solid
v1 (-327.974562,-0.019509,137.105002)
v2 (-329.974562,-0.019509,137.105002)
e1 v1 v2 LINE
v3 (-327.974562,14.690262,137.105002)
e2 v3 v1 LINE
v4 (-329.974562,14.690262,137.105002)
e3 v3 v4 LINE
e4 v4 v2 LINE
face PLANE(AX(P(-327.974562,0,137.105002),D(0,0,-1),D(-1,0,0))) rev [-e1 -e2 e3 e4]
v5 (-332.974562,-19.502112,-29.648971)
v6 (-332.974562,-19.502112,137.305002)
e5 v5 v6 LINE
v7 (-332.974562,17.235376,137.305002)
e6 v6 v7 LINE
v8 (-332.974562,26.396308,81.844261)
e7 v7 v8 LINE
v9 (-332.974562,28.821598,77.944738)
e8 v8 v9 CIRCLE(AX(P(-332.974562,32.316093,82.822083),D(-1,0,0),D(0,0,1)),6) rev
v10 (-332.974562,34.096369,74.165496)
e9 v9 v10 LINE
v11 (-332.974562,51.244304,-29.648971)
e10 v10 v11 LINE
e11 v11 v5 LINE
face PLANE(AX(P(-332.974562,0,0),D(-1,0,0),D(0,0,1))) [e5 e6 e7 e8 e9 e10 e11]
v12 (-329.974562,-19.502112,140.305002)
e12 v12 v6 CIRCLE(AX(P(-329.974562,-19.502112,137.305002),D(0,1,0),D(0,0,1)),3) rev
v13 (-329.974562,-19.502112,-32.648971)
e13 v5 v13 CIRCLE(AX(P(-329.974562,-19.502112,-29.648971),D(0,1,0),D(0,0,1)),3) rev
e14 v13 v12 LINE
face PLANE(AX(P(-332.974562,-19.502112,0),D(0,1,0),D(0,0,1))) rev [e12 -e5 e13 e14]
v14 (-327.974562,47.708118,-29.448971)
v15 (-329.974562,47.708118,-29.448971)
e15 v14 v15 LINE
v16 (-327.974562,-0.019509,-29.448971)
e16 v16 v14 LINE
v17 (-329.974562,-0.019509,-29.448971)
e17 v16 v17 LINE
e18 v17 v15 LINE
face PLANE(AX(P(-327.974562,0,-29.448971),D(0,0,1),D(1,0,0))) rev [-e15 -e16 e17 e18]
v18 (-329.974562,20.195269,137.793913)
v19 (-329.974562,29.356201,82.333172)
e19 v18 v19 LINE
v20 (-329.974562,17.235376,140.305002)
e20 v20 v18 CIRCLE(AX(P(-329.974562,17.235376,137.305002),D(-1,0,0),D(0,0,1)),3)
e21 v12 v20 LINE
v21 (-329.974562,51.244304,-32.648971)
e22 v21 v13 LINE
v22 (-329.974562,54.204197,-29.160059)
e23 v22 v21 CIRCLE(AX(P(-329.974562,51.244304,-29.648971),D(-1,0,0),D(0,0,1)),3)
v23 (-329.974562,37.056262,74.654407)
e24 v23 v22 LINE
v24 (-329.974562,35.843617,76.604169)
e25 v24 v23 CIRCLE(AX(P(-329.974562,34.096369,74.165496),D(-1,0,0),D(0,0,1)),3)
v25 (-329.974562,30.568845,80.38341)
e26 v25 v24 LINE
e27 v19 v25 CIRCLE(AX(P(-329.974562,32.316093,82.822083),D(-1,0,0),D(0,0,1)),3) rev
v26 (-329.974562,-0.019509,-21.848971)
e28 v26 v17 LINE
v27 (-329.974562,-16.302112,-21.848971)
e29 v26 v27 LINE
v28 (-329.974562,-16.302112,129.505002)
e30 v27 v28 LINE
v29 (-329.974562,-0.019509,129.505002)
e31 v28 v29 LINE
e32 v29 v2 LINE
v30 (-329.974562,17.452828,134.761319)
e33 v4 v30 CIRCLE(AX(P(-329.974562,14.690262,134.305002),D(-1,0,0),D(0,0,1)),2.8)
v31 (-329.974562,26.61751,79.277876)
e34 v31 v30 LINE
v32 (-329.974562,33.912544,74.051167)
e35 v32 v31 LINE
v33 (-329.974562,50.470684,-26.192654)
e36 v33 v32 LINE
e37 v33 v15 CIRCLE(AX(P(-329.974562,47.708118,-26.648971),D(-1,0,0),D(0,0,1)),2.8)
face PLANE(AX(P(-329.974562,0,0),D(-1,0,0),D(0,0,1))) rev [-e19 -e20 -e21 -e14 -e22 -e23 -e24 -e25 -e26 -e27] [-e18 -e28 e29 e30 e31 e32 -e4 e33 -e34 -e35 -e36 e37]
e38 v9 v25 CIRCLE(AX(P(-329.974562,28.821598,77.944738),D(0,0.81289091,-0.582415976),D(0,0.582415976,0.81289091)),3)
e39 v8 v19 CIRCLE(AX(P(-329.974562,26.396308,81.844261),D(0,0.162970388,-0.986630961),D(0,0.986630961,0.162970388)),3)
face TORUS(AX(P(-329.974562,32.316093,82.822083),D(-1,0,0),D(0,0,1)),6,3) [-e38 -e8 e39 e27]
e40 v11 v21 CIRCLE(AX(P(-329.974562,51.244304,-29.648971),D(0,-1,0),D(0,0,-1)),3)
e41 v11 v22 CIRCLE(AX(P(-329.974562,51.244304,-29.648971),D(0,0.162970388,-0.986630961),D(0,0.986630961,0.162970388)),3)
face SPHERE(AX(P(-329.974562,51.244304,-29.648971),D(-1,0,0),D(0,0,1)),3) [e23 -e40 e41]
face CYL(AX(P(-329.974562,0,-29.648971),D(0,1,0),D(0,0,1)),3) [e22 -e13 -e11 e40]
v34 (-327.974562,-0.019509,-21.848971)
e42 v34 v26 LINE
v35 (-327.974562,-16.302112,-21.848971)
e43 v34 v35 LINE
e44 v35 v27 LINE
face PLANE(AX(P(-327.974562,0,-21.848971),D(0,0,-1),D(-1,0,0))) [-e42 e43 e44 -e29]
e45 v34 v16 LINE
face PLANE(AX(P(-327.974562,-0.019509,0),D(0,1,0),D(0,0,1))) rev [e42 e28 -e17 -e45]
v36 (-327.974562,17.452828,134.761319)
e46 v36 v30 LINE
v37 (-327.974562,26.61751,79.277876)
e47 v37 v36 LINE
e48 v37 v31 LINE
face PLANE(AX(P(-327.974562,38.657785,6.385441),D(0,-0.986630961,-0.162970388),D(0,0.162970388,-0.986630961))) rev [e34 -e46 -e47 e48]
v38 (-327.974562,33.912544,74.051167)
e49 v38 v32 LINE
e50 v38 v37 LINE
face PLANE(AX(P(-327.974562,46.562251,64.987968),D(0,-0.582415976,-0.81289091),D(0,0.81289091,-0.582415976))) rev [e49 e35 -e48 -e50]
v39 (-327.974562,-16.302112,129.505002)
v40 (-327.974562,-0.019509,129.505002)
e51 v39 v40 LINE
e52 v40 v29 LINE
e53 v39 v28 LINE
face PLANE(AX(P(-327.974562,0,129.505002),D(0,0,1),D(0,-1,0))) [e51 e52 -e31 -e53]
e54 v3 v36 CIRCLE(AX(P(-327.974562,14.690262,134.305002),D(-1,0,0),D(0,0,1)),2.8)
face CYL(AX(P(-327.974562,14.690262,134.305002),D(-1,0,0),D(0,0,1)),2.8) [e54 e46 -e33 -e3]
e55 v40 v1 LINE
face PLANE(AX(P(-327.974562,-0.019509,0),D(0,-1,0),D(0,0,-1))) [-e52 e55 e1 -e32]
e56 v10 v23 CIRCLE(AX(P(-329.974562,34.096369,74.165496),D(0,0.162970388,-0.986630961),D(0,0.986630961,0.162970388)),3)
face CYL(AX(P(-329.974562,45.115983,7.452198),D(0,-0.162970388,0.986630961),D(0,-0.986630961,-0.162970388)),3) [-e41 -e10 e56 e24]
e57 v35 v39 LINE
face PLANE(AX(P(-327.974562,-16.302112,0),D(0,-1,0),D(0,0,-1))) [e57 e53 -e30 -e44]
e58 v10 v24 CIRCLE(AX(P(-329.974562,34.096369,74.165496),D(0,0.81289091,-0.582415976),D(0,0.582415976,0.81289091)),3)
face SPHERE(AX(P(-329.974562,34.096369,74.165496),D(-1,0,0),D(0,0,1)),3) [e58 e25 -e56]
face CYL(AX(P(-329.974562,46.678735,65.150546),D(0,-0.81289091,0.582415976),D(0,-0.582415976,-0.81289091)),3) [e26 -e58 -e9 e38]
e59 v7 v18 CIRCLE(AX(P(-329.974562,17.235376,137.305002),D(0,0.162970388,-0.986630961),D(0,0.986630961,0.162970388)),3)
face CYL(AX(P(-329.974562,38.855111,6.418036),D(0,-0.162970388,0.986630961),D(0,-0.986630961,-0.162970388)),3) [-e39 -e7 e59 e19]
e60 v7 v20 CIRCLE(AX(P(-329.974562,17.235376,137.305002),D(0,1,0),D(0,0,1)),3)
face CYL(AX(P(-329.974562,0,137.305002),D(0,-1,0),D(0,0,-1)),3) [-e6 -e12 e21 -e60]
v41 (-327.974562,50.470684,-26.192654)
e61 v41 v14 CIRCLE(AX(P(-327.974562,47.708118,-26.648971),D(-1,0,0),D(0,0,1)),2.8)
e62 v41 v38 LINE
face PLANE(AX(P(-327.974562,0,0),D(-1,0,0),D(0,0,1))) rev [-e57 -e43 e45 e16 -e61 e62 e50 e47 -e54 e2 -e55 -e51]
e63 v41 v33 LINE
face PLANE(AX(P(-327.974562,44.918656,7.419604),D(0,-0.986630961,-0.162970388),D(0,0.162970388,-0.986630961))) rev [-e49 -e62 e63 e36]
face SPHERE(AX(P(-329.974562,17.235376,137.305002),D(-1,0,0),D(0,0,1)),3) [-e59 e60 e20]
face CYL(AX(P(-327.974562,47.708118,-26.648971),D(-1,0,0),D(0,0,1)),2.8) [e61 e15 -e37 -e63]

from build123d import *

# Parameters (mm, degrees)
BOSS_EXTRUDE1_DEPTH = 2
BOSS_EXTRUDE2_START = 3
BOSS_EXTRUDE2_DEPTH = 3
FILLET1_R           = 3


with BuildPart() as part:
    # Sketch1 → Boss-Extrude1 (new body)
    with BuildSketch(Plane.ZY.offset(329.974562358)):
        with BuildLine():
            Line((137.105001839, 14.690261729), (137.105001839, -0.019509128))
            Line((137.105001839, -0.019509128), (133.705001839, -0.019509128))
            Line((133.705001839, -0.019509128), (129.505001839, -0.019509128))
            Line((129.505001839, -0.019509128), (129.505001839, -16.302112125))
            Line((129.505001839, -16.302112125), (-21.848970599, -16.302112125))
            Line((-21.848970599, -16.302112125), (-21.848970599, -0.019509128))
            Line((-21.848970599, -0.019509128), (-26.048970599, -0.019509128))
            Line((-26.048970599, -0.019509128), (-29.448970599, -0.019509128))
            Line((-29.448970599, -0.019509128), (-29.448970599, 47.708117707))
            ThreePointArc((-29.448970599, 47.708117707), (-28.460366767, 49.843262649), (-26.192653512, 50.470684397))
            Line((-26.192653512, 50.470684397), (74.05116687, 33.912543624))
            Line((74.05116687, 33.912543624), (79.277875997, 26.617509644))
            Line((79.277875997, 26.617509644), (134.761318926, 17.452828418))
            ThreePointArc((134.761318926, 17.452828418), (136.440146781, 16.501657897), (137.105001839, 14.690261729))
        make_face()
    extrude(amount=-BOSS_EXTRUDE1_DEPTH)

    # Sketch1<4> → Boss-Extrude2 (add)
    # profile 1 of 3: a face of its own
    with BuildSketch(Plane.ZY.offset(329.974562358).offset(BOSS_EXTRUDE2_START)):
        with BuildLine():
            Line((-32.648970599, -19.502112125), (140.305001839, -19.502112125))
            Line((140.305001839, -19.502112125), (140.305001839, -10.219509128))
            Line((140.305001839, -10.219509128), (133.705001839, -10.219509128))
            Line((133.705001839, -10.219509128), (133.705001839, -0.219509128))
            Line((133.705001839, -0.219509128), (137.305001839, -0.219509128))
            Line((137.305001839, -0.219509128), (137.305001839, 14.690261729))
            ThreePointArc((137.305001839, 14.690261729), (136.592657134, 16.631043337), (134.793913004, 17.650154611))
            Line((134.793913004, 17.650154611), (79.39220526, 26.801334927))
            Line((79.39220526, 26.801334927), (74.165496133, 34.096368907))
            Line((74.165496133, 34.096368907), (-26.160059434, 50.668010589))
            ThreePointArc((-26.160059434, 50.668010589), (-28.589752208, 49.995773002), (-29.648970599, 47.708117707))
            Line((-29.648970599, 47.708117707), (-29.648970599, -0.219509128))
            Line((-29.648970599, -0.219509128), (-26.048970599, -0.219509128))
            Line((-26.048970599, -0.219509128), (-26.048970599, -10.219509128))
            Line((-26.048970599, -10.219509128), (-32.648970599, -10.219509128))
            Line((-32.648970599, -10.219509128), (-32.648970599, -19.502112125))
        make_face()
        with BuildLine():
            ThreePointArc((137.105001839, 14.690261729), (136.440146781, 16.501657897), (134.761318926, 17.452828418))
            Line((134.761318926, 17.452828418), (79.277875997, 26.617509644))
            Line((79.277875997, 26.617509644), (74.05116687, 33.912543624))
            Line((74.05116687, 33.912543624), (-26.192653512, 50.470684397))
            ThreePointArc((-26.192653512, 50.470684397), (-28.460366767, 49.843262649), (-29.448970599, 47.708117707))
            Line((-29.448970599, 47.708117707), (-29.448970599, -0.019509128))
            Line((-29.448970599, -0.019509128), (-26.048970599, -0.019509128))
            Line((-26.048970599, -0.019509128), (-21.848970599, -0.019509128))
            Line((-21.848970599, -0.019509128), (-21.848970599, -16.302112125))
            Line((-21.848970599, -16.302112125), (129.505001839, -16.302112125))
            Line((129.505001839, -16.302112125), (129.505001839, -0.019509128))
            Line((129.505001839, -0.019509128), (133.705001839, -0.019509128))
            Line((133.705001839, -0.019509128), (137.105001839, -0.019509128))
            Line((137.105001839, -0.019509128), (137.105001839, 14.690261729))
        make_face(mode=Mode.SUBTRACT)
    # profile 2 of 3: a face of its own
    with BuildSketch(Plane.ZY.offset(329.974562358).offset(BOSS_EXTRUDE2_START)):
        with BuildLine():
            ThreePointArc((76.604168861, 35.843616835), (75.749893119, 36.643855156), (74.654407298, 37.056261789))
            Line((74.654407298, 37.056261789), (-29.160059434, 54.204197172))
            ThreePointArc((-29.160059434, 54.204197172), (-31.589752208, 53.531959584), (-32.648970599, 51.24430429))
            Line((-32.648970599, 51.24430429), (-32.648970599, -10.219509128))
            Line((-32.648970599, -10.219509128), (-26.048970599, -10.219509128))
            Line((-26.048970599, -10.219509128), (-26.048970599, -0.219509128))
            Line((-26.048970599, -0.219509128), (-29.648970599, -0.219509128))
            Line((-29.648970599, -0.219509128), (-29.648970599, 47.708117707))
            ThreePointArc((-29.648970599, 47.708117707), (-28.589752208, 49.995773002), (-26.160059434, 50.668010589))
            Line((-26.160059434, 50.668010589), (74.165496133, 34.096368907))
            Line((74.165496133, 34.096368907), (79.39220526, 26.801334927))
            Line((79.39220526, 26.801334927), (134.793913004, 17.650154611))
            ThreePointArc((134.793913004, 17.650154611), (136.592657134, 16.631043337), (137.305001839, 14.690261729))
            Line((137.305001839, 14.690261729), (137.305001839, -0.219509128))
            Line((137.305001839, -0.219509128), (133.705001839, -0.219509128))
            Line((133.705001839, -0.219509128), (133.705001839, -10.219509128))
            Line((133.705001839, -10.219509128), (140.305001839, -10.219509128))
            Line((140.305001839, -10.219509128), (140.305001839, 17.2353763))
            ThreePointArc((140.305001839, 17.2353763), (139.592657134, 19.176157909), (137.793913004, 20.195269182))
            Line((137.793913004, 20.195269182), (82.333171975, 29.356200538))
            ThreePointArc((82.333171975, 29.356200538), (81.237686153, 29.768607171), (80.383410411, 30.568845492))
            Line((80.383410411, 30.568845492), (76.604168861, 35.843616835))
        make_face()
    # profile 3 of 3: a face of its own
    with BuildSketch(Plane.ZY.offset(329.974562358).offset(BOSS_EXTRUDE2_START)):
        with BuildLine():
            Line((137.105001839, 14.690261729), (137.105001839, -0.019509128))
            Line((137.105001839, -0.019509128), (133.705001839, -0.019509128))
            Line((133.705001839, -0.019509128), (129.505001839, -0.019509128))
            Line((129.505001839, -0.019509128), (129.505001839, -16.302112125))
            Line((129.505001839, -16.302112125), (-21.848970599, -16.302112125))
            Line((-21.848970599, -16.302112125), (-21.848970599, -0.019509128))
            Line((-21.848970599, -0.019509128), (-26.048970599, -0.019509128))
            Line((-26.048970599, -0.019509128), (-29.448970599, -0.019509128))
            Line((-29.448970599, -0.019509128), (-29.448970599, 47.708117707))
            ThreePointArc((-29.448970599, 47.708117707), (-28.460366767, 49.843262649), (-26.192653512, 50.470684397))
            Line((-26.192653512, 50.470684397), (74.05116687, 33.912543624))
            Line((74.05116687, 33.912543624), (79.277875997, 26.617509644))
            Line((79.277875997, 26.617509644), (134.761318926, 17.452828418))
            ThreePointArc((134.761318926, 17.452828418), (136.440146781, 16.501657897), (137.105001839, 14.690261729))
        make_face()
    extrude(amount=-BOSS_EXTRUDE2_DEPTH)

    # Fillet1
    fillet1_edges = [part.edges().sort_by_distance(p)[0] for p in [
        (-332.974562358, 15.871096082, -32.648970599),
        (-332.974562358, 53.531959584, -31.589752208),
        (-332.974562358, 45.63022948, 22.747173932),
        (-332.974562358, 36.643855156, 75.749893119),
        (-332.974562358, 33.206231163, 78.493789636),
        (-332.974562358, 29.768607171, 81.237686153),
        (-332.974562358, 24.77573486, 110.063542489),
        (-332.974562358, 19.176157909, 139.592657134),
        (-332.974562358, -1.133367912, 140.305001839),
    ]]
    fillet(fillet1_edges, radius=FILLET1_R - 0.0001)  # a hair under: the kernel refuses the full size


with BuildPart() as body_2:
    # Mirror1: mirrored copy
    add(part.part.mirror(Plane.ZY.offset(327.974562358)))


solid = part.part
